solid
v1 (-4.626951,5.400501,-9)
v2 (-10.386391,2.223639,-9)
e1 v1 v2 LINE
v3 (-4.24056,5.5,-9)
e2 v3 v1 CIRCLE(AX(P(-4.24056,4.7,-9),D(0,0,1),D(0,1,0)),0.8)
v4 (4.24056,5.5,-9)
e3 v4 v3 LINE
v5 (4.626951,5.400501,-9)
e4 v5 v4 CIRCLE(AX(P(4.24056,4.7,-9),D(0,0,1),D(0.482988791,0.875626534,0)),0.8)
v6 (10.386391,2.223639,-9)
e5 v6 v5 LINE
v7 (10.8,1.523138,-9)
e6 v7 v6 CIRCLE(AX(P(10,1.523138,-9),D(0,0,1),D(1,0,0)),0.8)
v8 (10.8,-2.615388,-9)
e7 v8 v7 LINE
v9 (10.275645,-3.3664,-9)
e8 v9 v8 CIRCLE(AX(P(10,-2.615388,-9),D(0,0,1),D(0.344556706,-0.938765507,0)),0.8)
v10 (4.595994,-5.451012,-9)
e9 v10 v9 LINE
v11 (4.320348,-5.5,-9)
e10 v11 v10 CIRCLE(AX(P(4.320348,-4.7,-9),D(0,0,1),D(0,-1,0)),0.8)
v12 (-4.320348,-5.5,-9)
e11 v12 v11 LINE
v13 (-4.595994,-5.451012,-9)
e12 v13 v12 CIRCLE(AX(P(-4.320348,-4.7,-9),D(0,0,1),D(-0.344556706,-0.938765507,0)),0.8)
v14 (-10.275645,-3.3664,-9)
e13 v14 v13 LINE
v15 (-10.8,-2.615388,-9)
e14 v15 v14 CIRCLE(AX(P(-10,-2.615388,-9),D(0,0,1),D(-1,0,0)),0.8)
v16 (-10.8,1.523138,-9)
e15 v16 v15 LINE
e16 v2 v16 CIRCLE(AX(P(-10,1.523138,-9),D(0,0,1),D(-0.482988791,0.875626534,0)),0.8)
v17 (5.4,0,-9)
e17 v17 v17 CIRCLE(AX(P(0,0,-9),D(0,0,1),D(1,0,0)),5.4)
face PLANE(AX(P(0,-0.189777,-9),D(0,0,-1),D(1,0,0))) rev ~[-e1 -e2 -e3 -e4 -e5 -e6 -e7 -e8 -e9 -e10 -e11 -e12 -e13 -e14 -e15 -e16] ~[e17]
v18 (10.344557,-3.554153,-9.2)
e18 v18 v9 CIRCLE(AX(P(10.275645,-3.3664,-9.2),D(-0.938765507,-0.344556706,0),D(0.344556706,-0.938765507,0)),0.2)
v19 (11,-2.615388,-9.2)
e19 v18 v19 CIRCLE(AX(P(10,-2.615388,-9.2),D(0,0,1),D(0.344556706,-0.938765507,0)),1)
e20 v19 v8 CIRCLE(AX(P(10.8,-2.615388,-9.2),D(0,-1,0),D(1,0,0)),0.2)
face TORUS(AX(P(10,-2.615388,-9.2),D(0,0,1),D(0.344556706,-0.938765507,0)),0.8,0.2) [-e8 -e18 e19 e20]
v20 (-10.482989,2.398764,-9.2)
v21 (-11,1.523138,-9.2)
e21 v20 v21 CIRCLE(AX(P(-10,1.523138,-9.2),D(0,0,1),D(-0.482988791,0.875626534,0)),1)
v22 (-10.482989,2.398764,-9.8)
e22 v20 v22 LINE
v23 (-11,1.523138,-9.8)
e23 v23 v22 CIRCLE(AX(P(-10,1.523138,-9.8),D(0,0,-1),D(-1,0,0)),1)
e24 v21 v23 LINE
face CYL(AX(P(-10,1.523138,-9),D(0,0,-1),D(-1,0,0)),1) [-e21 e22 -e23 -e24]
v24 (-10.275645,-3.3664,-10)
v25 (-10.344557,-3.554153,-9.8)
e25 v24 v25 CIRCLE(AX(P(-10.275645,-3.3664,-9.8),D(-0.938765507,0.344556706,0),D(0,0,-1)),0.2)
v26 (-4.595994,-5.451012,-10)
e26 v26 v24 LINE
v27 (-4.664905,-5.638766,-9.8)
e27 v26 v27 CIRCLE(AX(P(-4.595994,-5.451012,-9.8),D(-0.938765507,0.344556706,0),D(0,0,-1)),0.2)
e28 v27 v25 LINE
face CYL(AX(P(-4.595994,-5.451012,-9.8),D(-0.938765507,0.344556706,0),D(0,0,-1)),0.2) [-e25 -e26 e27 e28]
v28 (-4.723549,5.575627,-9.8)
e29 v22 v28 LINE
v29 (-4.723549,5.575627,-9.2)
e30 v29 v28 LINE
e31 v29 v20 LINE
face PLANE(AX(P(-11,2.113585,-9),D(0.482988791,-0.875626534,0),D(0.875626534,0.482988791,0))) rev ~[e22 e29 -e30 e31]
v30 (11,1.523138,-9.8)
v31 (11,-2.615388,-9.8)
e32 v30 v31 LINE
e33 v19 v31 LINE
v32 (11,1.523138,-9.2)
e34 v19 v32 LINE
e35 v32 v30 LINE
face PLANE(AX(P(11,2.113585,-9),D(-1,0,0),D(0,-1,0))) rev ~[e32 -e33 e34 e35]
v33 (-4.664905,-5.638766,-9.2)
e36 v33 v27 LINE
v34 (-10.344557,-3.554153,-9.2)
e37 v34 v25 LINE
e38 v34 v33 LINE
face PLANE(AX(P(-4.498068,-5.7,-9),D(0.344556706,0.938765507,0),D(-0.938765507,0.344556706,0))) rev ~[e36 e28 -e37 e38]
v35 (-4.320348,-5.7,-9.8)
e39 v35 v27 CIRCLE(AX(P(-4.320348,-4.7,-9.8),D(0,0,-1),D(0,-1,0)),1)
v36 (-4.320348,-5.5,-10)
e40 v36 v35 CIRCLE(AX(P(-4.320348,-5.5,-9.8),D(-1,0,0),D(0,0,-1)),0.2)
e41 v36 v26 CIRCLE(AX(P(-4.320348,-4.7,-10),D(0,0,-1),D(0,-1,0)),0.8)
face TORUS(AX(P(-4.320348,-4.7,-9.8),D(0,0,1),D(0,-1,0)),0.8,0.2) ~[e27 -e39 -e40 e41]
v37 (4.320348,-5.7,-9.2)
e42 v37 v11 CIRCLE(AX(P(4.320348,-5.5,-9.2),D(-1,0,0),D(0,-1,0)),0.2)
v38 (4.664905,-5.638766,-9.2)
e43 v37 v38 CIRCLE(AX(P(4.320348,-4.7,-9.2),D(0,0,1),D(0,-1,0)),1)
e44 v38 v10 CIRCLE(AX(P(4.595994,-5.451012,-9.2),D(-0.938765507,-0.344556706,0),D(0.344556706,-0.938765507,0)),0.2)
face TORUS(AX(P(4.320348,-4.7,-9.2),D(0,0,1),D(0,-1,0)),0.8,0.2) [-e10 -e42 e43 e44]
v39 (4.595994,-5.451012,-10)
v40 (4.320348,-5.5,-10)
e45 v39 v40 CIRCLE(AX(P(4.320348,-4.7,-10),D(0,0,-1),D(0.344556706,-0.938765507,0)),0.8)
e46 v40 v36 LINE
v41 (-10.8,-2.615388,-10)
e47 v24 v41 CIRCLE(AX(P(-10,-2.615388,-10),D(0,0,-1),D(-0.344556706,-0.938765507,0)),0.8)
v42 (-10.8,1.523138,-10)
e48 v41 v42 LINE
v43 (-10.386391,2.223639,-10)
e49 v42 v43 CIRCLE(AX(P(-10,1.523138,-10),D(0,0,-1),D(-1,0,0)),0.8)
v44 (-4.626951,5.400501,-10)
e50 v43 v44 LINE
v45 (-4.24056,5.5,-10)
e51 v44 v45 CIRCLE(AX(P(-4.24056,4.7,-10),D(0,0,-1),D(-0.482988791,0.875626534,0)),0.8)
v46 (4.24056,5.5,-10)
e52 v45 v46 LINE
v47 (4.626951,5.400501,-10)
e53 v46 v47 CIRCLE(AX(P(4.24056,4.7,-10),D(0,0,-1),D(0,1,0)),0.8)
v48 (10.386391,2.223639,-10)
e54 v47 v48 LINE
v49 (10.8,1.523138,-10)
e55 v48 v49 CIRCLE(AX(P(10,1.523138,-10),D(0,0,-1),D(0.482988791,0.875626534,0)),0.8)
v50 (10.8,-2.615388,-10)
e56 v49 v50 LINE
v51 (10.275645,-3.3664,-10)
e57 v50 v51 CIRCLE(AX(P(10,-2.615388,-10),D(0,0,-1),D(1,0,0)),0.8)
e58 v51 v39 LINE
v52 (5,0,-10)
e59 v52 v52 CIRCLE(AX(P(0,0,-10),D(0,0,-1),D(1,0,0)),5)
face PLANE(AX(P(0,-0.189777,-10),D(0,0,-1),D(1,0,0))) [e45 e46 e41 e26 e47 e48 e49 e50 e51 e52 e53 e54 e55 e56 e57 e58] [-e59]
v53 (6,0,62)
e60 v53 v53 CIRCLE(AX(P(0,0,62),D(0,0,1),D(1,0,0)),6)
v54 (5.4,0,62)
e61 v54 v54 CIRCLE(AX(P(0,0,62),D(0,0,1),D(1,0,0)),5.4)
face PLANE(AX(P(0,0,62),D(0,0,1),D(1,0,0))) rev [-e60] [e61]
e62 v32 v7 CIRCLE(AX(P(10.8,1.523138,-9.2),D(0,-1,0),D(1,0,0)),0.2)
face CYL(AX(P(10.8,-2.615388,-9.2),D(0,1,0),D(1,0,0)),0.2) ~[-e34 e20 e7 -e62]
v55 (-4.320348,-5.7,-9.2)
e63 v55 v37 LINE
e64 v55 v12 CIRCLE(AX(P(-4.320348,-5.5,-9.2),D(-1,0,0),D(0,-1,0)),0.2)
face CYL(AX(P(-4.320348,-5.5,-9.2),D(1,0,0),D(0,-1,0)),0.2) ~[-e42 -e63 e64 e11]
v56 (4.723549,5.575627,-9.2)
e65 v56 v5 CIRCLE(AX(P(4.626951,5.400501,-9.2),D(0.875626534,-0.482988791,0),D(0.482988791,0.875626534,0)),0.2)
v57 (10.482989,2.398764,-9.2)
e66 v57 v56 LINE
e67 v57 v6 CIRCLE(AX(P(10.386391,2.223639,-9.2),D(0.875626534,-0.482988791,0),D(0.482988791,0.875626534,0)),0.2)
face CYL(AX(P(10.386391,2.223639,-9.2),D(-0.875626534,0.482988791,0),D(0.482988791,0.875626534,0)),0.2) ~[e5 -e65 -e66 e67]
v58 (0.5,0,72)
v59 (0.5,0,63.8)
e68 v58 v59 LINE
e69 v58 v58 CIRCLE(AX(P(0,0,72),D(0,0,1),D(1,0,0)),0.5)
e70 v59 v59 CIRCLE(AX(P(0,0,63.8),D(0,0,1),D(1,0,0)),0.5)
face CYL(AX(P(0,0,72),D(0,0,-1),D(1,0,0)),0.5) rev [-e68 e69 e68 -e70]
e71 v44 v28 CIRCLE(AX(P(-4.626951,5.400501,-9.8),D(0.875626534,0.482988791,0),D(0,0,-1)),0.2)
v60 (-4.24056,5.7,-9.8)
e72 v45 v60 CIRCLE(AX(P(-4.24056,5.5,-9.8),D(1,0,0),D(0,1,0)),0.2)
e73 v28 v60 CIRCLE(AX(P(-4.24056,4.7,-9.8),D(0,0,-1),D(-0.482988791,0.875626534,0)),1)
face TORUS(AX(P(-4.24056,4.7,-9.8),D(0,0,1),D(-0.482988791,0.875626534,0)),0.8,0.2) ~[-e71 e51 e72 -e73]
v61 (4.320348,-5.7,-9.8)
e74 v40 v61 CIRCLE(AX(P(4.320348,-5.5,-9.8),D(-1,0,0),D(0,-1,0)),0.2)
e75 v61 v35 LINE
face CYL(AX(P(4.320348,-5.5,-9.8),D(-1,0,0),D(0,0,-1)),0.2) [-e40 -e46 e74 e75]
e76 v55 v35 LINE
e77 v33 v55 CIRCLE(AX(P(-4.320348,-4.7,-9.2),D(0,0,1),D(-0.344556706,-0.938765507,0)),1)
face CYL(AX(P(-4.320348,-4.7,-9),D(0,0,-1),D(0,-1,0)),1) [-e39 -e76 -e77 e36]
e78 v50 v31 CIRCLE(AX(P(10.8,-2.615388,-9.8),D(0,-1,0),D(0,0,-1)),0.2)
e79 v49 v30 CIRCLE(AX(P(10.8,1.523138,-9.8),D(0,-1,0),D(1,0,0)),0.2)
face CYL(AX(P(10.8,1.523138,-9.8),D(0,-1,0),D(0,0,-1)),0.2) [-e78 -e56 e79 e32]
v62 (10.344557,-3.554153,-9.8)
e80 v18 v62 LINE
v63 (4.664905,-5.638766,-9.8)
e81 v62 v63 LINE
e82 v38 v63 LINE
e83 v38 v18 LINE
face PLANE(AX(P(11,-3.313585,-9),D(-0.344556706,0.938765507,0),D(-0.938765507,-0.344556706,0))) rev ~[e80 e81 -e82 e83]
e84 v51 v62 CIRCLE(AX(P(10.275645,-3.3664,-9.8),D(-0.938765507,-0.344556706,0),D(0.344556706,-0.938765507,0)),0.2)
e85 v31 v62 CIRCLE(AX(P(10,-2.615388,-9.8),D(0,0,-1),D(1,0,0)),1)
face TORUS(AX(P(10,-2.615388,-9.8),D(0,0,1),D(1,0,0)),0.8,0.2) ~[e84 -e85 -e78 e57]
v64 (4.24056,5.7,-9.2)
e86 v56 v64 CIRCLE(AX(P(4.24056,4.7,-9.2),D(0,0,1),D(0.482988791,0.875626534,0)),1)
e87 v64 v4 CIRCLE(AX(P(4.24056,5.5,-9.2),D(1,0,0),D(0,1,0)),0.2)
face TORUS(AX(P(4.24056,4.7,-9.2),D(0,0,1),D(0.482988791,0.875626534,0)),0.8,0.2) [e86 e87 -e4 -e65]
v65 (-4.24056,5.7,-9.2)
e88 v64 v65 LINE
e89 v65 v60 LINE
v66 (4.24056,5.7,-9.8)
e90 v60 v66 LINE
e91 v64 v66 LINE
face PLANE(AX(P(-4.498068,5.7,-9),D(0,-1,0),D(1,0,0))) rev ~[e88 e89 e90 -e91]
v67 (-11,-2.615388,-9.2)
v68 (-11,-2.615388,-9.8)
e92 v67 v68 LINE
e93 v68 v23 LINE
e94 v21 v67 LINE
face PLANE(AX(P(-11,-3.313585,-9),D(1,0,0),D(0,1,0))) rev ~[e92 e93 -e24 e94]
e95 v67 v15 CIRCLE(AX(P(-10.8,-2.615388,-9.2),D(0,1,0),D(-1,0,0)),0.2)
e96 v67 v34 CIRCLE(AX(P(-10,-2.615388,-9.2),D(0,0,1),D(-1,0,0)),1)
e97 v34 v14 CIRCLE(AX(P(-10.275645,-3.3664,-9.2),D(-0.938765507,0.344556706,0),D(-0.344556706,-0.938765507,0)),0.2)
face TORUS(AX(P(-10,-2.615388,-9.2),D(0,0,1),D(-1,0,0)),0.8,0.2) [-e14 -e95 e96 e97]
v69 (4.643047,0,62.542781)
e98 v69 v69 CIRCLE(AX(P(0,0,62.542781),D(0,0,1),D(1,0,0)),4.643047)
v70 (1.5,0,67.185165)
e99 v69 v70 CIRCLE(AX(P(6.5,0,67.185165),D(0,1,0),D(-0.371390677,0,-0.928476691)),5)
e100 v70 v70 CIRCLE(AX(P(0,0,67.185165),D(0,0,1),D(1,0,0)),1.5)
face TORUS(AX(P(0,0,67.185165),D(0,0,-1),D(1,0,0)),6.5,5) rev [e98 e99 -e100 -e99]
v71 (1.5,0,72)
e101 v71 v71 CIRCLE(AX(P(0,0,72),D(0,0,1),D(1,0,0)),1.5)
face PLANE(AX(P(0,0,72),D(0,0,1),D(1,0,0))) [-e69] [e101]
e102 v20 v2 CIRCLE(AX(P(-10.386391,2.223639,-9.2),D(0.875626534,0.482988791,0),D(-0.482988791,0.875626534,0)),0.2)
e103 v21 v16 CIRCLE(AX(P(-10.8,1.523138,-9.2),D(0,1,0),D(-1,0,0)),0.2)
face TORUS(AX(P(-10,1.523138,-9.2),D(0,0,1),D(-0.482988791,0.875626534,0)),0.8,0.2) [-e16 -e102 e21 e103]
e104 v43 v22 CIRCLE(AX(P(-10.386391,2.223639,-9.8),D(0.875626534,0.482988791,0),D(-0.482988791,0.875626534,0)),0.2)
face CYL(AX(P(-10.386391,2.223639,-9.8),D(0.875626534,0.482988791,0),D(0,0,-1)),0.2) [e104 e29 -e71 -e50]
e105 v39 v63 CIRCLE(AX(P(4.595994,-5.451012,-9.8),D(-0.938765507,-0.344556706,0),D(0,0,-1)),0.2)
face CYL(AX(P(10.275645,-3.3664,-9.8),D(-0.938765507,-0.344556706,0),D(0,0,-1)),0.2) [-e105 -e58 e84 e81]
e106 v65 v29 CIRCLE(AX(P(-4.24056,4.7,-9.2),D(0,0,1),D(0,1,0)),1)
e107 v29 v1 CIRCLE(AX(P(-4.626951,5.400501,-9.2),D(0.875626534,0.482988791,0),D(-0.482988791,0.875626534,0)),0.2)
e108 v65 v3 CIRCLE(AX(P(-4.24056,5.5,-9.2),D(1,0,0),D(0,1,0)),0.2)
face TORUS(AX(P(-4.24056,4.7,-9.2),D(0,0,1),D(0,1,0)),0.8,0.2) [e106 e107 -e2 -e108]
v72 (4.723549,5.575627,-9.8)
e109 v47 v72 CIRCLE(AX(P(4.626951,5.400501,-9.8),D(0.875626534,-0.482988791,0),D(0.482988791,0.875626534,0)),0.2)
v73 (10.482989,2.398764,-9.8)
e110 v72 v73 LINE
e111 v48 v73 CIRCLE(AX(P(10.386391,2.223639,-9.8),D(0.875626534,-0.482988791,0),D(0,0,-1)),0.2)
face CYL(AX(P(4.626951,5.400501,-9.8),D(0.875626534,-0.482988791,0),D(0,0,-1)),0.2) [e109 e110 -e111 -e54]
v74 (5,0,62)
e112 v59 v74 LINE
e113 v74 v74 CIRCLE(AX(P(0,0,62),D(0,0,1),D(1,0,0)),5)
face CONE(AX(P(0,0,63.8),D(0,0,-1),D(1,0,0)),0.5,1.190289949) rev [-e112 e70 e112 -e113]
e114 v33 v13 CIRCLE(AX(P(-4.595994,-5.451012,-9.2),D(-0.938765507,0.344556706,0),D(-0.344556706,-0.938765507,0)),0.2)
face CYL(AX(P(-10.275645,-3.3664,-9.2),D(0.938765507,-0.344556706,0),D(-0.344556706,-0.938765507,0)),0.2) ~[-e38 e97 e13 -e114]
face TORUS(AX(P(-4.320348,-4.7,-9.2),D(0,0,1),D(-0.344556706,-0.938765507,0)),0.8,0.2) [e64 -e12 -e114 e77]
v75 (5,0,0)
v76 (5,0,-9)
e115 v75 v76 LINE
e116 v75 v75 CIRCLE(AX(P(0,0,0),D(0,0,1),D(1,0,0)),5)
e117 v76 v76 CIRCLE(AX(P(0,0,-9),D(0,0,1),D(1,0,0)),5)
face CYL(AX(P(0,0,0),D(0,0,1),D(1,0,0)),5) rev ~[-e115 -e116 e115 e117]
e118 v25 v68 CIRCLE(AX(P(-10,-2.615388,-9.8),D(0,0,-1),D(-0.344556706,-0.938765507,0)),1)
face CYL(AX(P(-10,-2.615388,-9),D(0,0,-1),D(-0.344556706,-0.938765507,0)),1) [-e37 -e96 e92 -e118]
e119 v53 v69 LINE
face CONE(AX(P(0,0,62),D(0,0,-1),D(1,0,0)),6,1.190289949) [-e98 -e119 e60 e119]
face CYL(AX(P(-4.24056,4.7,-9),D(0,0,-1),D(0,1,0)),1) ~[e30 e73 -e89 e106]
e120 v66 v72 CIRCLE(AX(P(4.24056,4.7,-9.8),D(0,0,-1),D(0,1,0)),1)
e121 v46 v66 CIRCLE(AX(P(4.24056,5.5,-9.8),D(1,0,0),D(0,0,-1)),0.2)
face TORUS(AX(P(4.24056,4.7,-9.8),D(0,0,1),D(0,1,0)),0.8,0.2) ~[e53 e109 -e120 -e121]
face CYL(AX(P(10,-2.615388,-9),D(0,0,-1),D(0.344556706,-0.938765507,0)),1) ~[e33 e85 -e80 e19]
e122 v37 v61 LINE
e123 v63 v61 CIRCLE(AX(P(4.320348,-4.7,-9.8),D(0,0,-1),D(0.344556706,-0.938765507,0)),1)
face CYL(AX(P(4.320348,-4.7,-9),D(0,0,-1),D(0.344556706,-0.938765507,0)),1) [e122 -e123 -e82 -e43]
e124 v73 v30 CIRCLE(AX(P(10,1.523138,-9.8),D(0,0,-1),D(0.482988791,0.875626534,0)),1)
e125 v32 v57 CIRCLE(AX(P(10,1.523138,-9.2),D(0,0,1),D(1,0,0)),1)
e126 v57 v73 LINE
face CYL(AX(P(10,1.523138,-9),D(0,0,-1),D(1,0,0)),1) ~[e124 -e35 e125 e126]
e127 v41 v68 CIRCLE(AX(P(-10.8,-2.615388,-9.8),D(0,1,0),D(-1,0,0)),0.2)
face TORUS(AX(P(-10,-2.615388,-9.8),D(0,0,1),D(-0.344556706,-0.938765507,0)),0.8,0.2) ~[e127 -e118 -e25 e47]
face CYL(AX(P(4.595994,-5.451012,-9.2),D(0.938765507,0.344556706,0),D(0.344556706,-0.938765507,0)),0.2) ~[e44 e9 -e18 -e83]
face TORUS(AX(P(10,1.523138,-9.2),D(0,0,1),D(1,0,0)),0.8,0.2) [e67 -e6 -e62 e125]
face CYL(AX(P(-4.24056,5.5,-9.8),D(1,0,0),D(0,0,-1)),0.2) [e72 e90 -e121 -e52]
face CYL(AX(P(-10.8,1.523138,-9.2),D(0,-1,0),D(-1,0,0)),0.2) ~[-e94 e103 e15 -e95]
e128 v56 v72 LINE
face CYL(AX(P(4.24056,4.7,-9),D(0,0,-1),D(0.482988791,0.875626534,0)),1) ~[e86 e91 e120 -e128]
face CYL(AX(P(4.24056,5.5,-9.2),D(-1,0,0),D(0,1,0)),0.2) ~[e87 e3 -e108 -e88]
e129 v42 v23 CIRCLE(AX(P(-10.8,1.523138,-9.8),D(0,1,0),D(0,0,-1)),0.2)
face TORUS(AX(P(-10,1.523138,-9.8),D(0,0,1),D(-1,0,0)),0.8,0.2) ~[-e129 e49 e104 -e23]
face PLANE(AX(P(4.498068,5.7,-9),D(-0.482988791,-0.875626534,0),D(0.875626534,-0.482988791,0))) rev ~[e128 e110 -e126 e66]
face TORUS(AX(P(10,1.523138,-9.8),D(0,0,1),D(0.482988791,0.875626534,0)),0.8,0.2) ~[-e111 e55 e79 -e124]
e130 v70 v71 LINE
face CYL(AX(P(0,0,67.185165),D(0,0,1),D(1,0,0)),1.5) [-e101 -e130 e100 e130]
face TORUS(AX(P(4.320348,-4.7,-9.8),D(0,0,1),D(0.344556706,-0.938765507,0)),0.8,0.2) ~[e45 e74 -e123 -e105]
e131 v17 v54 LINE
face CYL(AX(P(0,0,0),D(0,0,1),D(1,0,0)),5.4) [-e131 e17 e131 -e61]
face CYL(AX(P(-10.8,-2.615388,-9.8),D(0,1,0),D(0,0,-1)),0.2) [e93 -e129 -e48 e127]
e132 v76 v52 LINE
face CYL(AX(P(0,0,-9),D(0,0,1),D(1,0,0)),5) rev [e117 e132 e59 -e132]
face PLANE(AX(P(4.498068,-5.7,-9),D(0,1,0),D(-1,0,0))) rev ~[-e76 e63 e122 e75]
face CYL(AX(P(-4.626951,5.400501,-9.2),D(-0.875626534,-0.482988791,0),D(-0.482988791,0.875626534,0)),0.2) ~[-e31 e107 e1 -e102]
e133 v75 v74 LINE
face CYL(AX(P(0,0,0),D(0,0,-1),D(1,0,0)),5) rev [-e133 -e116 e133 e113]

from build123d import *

# Parameters (mm, degrees)
F0_R          = 5.4
F0_R_2        = 5
F1_DEPTH      = 62
F1_DEPTH_BACK = 9
F5_R          = 5
F6_DEPTH      = 1
F7_R          = 1
F8_R          = 0.2
F9_R          = 0.2


# Not quite as in the source:
# - a feature names something its author has since deleted; it is built from what else it names


with BuildPart() as f1:
    # F0 (on Top) → F1 (new body, two sides)
    with BuildSketch(Plane.XY) as f1_sk:
        Circle(F0_R)
        Circle(F0_R_2, mode=Mode.SUBTRACT)
    extrude(amount=F1_DEPTH)
    extrude(f1_sk.sketch, amount=-F1_DEPTH_BACK)

    # F2 (on Front) → F3 (revolve)
    with BuildSketch(Plane.XZ):
        with BuildLine():
            Line((6, 62), (4.6430466171, 62.5427813535))
            ThreePointArc((4.6430466171, 62.5427813535), (2.3596638473, 64.3820207615), (1.5, 67.1851648075))
            Line((1.5, 67.1851648075), (1.5, 72))
            Line((1.5, 72), (0.5, 72))
            Line((0.5, 72), (0.5, 63.8000000012))
            Line((0.5, 63.8000000012), (5, 62))
            Line((5, 62), (6, 62))
        make_face()
    revolve(axis=Axis((0, 0, 62.4439572394), (0, 0, 1)))

    # F5 (on offset) → F6 (join)
    with BuildSketch(Plane(origin=(0, 0, -9), x_dir=(1, 0, 0), z_dir=(0, 0, -1))):
        Polygon((11, 3.3135847191), (4.4980677776, 5.7), (-4.4980677776, 5.7), (-11, 3.3135847191), (-11, -2.1135847191), (-4.4980677776, -5.7), (4.4980677776, -5.7), (11, -2.1135847191), align=None)
        Circle(F5_R, mode=Mode.SUBTRACT)
    extrude(amount=F6_DEPTH)

    # F7
    f7_edges = [f1.edges().sort_by_distance(p)[0] for p in [
        (11, 2.113585, -9.5),
        (11, -3.313585, -9.5),
        (4.498068, 5.7, -9.5),
        (4.498068, -5.7, -9.5),
        (-4.498068, 5.7, -9.5),
        (-4.498068, -5.7, -9.5),
        (-11, 2.113585, -9.5),
        (-11, -3.313585, -9.5),
    ]]
    fillet(f7_edges, radius=F7_R)

    # F8
    f8_edges = [f1.edges().sort_by_distance(p)[0] for p in [
        (-7.504731, -4.596459, -10),
        (-4.495326, -5.684572, -10),
        (0, -5.7, -10),
        (-11, -0.546125, -10),
        (-10.819926, -3.187857, -10),
        (-10.861101, 2.031572, -10),
        (-7.603269, 3.987195, -10),
        (-4.489932, 5.668408, -10),
        (0, 5.7, -10),
        (4.489932, 5.668408, -10),
        (7.603269, 3.987195, -10),
        (7.504731, -4.596459, -10),
        (4.495326, -5.684572, -10),
        (10.819926, -3.187857, -10),
        (11, -0.546125, -10),
        (10.861101, 2.031572, -10),
    ]]
    fillet(f8_edges, radius=F8_R)

    # F9
    f9_edges = [f1.edges().sort_by_distance(p)[0] for p in [
        (10.819926, -3.187857, -9),
        (11, -0.546125, -9),
        (10.861101, 2.031572, -9),
        (7.603269, 3.987195, -9),
        (4.489932, 5.668408, -9),
        (0, 5.7, -9),
        (-4.489932, 5.668408, -9),
        (-10.861101, 2.031572, -9),
        (-7.603269, 3.987195, -9),
        (7.504731, -4.596459, -9),
        (0, -5.7, -9),
        (-11, -0.546125, -9),
        (-10.819926, -3.187857, -9),
        (-4.495326, -5.684572, -9),
        (4.495326, -5.684572, -9),
        (-7.504731, -4.596459, -9),
    ]]
    fillet(f9_edges, radius=F9_R)


solid = f1.part
